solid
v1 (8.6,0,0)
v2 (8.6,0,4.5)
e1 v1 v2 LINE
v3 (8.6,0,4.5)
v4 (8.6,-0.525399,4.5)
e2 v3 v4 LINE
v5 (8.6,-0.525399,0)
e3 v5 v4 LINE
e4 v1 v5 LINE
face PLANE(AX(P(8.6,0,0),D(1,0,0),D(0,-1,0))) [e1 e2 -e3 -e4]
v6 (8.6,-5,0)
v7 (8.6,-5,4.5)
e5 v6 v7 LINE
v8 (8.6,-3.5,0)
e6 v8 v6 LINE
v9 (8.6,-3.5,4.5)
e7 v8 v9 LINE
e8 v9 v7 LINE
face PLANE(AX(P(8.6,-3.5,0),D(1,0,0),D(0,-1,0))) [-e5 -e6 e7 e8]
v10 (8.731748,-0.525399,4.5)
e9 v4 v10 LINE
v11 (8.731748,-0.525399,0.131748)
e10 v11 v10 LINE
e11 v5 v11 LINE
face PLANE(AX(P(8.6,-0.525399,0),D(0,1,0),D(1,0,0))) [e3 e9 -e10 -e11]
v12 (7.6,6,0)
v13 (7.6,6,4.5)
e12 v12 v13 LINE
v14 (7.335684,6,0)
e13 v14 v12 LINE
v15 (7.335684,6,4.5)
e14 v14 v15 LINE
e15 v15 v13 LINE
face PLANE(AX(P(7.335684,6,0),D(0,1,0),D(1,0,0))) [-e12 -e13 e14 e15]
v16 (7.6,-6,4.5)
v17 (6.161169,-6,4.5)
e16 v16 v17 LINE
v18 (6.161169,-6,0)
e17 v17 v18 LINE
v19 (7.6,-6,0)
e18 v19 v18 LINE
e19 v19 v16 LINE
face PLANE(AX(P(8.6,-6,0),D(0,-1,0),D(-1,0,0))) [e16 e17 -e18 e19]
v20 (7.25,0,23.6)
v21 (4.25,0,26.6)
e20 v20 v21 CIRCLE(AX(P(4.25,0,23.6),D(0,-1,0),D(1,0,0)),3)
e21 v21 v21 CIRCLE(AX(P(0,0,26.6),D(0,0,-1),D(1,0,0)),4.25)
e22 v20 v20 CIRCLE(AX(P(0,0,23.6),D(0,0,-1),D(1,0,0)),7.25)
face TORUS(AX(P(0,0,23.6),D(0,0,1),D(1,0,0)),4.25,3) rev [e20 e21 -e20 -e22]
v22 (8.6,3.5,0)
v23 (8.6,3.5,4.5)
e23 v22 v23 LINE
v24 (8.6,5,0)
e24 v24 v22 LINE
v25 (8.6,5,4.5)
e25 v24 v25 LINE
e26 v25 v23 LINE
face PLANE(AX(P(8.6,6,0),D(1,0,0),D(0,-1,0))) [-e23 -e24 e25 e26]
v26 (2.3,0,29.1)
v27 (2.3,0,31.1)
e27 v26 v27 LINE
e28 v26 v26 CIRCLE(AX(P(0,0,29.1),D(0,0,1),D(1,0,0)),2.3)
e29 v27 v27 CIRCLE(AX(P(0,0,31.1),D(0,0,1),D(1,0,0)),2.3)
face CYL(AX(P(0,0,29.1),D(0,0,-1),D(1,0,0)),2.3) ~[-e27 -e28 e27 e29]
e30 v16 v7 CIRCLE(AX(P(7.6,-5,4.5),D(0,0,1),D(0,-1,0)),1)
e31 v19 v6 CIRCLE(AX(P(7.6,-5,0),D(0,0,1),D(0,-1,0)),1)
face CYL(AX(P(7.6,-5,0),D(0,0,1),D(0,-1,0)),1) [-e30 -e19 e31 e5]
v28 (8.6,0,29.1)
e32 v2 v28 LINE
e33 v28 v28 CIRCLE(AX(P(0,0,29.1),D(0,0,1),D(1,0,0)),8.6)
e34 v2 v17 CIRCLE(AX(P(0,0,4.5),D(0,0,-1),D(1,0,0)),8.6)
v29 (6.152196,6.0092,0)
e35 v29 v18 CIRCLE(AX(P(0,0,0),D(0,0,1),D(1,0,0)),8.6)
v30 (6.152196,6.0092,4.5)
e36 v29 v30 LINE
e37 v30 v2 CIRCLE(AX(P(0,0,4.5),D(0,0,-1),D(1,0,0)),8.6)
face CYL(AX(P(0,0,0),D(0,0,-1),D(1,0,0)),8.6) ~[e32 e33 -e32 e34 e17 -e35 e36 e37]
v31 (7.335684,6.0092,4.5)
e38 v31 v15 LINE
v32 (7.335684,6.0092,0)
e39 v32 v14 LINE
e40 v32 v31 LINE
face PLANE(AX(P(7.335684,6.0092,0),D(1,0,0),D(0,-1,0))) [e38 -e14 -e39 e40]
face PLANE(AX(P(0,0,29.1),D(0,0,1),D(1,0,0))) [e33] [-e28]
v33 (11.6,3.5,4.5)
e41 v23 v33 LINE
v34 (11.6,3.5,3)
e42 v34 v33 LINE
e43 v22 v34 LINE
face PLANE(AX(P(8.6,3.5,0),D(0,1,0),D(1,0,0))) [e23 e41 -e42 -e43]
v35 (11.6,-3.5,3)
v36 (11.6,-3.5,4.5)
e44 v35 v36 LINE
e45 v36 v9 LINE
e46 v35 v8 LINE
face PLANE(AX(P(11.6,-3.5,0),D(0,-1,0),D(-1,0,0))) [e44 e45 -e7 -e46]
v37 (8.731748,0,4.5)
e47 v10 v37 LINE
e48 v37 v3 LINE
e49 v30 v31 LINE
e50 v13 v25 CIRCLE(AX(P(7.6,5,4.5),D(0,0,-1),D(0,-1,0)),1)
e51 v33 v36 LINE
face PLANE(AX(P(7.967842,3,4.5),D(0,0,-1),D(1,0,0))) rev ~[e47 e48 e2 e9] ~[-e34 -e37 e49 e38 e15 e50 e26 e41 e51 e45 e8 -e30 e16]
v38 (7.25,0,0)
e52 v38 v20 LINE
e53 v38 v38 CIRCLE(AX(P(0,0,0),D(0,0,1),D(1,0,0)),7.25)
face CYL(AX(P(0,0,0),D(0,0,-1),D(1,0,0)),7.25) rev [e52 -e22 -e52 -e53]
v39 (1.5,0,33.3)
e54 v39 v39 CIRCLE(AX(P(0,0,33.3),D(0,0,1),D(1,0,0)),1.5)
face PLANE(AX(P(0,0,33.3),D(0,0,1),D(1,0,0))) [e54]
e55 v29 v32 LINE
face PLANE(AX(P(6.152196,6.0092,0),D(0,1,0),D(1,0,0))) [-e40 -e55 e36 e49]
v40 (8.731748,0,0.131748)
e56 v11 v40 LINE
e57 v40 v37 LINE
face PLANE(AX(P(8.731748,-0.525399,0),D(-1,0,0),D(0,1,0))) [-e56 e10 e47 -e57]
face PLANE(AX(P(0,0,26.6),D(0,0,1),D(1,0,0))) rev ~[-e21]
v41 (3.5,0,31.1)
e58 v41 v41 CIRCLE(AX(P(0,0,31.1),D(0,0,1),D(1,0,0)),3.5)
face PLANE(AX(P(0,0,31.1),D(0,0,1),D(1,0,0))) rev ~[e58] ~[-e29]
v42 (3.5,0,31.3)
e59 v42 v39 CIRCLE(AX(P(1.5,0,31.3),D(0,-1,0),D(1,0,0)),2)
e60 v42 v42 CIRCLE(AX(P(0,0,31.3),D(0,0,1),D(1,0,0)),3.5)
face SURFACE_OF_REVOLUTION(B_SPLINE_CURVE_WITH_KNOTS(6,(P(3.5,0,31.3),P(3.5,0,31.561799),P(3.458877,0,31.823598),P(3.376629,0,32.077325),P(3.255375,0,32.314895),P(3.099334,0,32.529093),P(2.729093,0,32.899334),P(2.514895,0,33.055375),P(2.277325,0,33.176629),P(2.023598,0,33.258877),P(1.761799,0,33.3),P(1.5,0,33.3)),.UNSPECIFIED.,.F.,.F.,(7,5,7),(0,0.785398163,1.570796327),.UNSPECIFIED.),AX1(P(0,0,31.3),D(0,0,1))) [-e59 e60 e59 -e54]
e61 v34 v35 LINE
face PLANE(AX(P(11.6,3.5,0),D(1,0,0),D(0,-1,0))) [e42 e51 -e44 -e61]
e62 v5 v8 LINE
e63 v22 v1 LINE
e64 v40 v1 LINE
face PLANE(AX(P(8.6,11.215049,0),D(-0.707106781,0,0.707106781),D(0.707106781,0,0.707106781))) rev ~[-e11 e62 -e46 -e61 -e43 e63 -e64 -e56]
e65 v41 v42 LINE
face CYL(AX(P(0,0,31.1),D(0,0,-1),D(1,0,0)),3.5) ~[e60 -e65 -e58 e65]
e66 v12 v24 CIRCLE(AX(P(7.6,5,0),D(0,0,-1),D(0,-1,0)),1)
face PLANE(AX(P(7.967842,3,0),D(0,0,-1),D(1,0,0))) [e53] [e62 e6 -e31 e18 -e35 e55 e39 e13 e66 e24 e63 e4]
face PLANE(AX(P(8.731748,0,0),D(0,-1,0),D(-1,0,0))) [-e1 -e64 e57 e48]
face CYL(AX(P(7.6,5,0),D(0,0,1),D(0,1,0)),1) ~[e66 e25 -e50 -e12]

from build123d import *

# Parameters (mm, degrees)
F0_R         = 8.6
F0_R_2       = 7.25
F1_DEPTH     = 29.1
F2_R         = 8.6
F3_DEPTH     = 2.5
F4_R         = 3
F5_R         = 2.3
F6_DEPTH     = 2
F7_DEPTH     = 2
F8_R         = 3.5
F9_DEPTH     = 2.2
F10_R        = 2
F12_DEPTH    = 4.5
F13_T1_DEPTH = 22.4300979278
F14_R        = 1


# Not quite as in the source:
# - a fillet or chamfer that OpenCascade refuses, or shapes differently, is made with other operations: its cross-section is extruded or revolved along the edge and cut away or added


with BuildPart() as f1:
    # F0 (on Top) → F1 (new body)
    with BuildSketch(Plane.XY):
        Circle(F0_R)
        Circle(F0_R_2, mode=Mode.SUBTRACT)
    extrude(amount=F1_DEPTH)

    # F2 (on face) → F3 (join)
    with BuildSketch(Plane.XY.offset(29.1)):
        Circle(F2_R)
    extrude(amount=-F3_DEPTH)

    # F4
    f4_edges = [f1.edges().sort_by_distance(p)[0] for p in [
        (-7.25, 0, 26.6),
    ]]
    fillet(f4_edges, radius=F4_R)

    # F5 (on face) → F6 (join)
    with BuildSketch(Plane.XY.offset(29.1)):
        Circle(F5_R)
    extrude(amount=F6_DEPTH)

    # F5 (on face) → F7 (join)
    with BuildSketch(Plane.XY.offset(29.1)):
        Circle(F5_R)
    extrude(amount=-F7_DEPTH)

    # F8 (on face) → F9 (join)
    with BuildSketch(Plane.XY.offset(31.1)):
        Circle(F8_R)
    extrude(amount=F9_DEPTH)

    # F10
    f10_edges = [f1.edges().sort_by_distance(p)[0] for p in [
        (-3.5, 0, 33.3),
    ]]
    fillet(f10_edges, radius=F10_R)

    # F11 (on face) → F12 (join)
    with BuildSketch(Plane(origin=(0, 0, 0), x_dir=(1, 0, 0), z_dir=(0, 0, -1))):
        Polygon((8.6, -3.5), (8.6, 0), (7.3356842622, 0), (7.3356842622, -6), (8.6, -6), align=None)
        Polygon((7.3356842622, 0), (8.6, 0), (8.6, 0.5253988202), (8.6, 3.5), (8.6, 6), (7.3356842622, 6), align=None)
        Polygon((8.7317479774, 0), (8.6, 0), (8.6, -3.5), (11.6, -3.5), (11.6, 0), align=None)
        with BuildLine():
            Line((7.3356842622, -6), (7.3356842622, 0))
            Line((7.3356842622, 0), (7.3356842622, 6))
            Line((7.3356842622, 6), (6.1521958246, 6))
            Line((6.1521958246, 6), (6.1521958246, 3.8678361166))
            ThreePointArc((6.1521958246, 3.8678361166), (7.267026193, 0), (6.1521958246, -3.8678361166))
            Line((6.1521958246, -3.8678361166), (6.1521958246, -6.0092001577))
            Line((6.1521958246, -6.0092001577), (7.3356842622, -6.0092001577))
            Line((7.3356842622, -6.0092001577), (7.3356842622, -6))
        make_face()
        Polygon((8.6, 3.5), (8.6, 0.5253988202), (8.7317479774, 0.5253988202), (8.7317479774, 0), (11.6, 0), (11.6, 3.5), align=None)
    extrude(amount=-F12_DEPTH)

    # F13: chamfer of 3 on 1 edges, made by hand

    # F13_s2 → F13_t1 (cut)
    with BuildSketch(Plane.XZ.offset(-11.2150489639)):
        Polygon((8.6, 0), (11.6, 3), (11.6, 0), align=None)
    extrude(amount=F13_T1_DEPTH, mode=Mode.SUBTRACT)

    # F14
    f14_edges = [f1.edges().sort_by_distance(p)[0] for p in [
        (8.6, 6, 2.25),
        (8.6, -6, 2.25),
    ]]
    fillet(f14_edges, radius=F14_R)


solid = f1.part
